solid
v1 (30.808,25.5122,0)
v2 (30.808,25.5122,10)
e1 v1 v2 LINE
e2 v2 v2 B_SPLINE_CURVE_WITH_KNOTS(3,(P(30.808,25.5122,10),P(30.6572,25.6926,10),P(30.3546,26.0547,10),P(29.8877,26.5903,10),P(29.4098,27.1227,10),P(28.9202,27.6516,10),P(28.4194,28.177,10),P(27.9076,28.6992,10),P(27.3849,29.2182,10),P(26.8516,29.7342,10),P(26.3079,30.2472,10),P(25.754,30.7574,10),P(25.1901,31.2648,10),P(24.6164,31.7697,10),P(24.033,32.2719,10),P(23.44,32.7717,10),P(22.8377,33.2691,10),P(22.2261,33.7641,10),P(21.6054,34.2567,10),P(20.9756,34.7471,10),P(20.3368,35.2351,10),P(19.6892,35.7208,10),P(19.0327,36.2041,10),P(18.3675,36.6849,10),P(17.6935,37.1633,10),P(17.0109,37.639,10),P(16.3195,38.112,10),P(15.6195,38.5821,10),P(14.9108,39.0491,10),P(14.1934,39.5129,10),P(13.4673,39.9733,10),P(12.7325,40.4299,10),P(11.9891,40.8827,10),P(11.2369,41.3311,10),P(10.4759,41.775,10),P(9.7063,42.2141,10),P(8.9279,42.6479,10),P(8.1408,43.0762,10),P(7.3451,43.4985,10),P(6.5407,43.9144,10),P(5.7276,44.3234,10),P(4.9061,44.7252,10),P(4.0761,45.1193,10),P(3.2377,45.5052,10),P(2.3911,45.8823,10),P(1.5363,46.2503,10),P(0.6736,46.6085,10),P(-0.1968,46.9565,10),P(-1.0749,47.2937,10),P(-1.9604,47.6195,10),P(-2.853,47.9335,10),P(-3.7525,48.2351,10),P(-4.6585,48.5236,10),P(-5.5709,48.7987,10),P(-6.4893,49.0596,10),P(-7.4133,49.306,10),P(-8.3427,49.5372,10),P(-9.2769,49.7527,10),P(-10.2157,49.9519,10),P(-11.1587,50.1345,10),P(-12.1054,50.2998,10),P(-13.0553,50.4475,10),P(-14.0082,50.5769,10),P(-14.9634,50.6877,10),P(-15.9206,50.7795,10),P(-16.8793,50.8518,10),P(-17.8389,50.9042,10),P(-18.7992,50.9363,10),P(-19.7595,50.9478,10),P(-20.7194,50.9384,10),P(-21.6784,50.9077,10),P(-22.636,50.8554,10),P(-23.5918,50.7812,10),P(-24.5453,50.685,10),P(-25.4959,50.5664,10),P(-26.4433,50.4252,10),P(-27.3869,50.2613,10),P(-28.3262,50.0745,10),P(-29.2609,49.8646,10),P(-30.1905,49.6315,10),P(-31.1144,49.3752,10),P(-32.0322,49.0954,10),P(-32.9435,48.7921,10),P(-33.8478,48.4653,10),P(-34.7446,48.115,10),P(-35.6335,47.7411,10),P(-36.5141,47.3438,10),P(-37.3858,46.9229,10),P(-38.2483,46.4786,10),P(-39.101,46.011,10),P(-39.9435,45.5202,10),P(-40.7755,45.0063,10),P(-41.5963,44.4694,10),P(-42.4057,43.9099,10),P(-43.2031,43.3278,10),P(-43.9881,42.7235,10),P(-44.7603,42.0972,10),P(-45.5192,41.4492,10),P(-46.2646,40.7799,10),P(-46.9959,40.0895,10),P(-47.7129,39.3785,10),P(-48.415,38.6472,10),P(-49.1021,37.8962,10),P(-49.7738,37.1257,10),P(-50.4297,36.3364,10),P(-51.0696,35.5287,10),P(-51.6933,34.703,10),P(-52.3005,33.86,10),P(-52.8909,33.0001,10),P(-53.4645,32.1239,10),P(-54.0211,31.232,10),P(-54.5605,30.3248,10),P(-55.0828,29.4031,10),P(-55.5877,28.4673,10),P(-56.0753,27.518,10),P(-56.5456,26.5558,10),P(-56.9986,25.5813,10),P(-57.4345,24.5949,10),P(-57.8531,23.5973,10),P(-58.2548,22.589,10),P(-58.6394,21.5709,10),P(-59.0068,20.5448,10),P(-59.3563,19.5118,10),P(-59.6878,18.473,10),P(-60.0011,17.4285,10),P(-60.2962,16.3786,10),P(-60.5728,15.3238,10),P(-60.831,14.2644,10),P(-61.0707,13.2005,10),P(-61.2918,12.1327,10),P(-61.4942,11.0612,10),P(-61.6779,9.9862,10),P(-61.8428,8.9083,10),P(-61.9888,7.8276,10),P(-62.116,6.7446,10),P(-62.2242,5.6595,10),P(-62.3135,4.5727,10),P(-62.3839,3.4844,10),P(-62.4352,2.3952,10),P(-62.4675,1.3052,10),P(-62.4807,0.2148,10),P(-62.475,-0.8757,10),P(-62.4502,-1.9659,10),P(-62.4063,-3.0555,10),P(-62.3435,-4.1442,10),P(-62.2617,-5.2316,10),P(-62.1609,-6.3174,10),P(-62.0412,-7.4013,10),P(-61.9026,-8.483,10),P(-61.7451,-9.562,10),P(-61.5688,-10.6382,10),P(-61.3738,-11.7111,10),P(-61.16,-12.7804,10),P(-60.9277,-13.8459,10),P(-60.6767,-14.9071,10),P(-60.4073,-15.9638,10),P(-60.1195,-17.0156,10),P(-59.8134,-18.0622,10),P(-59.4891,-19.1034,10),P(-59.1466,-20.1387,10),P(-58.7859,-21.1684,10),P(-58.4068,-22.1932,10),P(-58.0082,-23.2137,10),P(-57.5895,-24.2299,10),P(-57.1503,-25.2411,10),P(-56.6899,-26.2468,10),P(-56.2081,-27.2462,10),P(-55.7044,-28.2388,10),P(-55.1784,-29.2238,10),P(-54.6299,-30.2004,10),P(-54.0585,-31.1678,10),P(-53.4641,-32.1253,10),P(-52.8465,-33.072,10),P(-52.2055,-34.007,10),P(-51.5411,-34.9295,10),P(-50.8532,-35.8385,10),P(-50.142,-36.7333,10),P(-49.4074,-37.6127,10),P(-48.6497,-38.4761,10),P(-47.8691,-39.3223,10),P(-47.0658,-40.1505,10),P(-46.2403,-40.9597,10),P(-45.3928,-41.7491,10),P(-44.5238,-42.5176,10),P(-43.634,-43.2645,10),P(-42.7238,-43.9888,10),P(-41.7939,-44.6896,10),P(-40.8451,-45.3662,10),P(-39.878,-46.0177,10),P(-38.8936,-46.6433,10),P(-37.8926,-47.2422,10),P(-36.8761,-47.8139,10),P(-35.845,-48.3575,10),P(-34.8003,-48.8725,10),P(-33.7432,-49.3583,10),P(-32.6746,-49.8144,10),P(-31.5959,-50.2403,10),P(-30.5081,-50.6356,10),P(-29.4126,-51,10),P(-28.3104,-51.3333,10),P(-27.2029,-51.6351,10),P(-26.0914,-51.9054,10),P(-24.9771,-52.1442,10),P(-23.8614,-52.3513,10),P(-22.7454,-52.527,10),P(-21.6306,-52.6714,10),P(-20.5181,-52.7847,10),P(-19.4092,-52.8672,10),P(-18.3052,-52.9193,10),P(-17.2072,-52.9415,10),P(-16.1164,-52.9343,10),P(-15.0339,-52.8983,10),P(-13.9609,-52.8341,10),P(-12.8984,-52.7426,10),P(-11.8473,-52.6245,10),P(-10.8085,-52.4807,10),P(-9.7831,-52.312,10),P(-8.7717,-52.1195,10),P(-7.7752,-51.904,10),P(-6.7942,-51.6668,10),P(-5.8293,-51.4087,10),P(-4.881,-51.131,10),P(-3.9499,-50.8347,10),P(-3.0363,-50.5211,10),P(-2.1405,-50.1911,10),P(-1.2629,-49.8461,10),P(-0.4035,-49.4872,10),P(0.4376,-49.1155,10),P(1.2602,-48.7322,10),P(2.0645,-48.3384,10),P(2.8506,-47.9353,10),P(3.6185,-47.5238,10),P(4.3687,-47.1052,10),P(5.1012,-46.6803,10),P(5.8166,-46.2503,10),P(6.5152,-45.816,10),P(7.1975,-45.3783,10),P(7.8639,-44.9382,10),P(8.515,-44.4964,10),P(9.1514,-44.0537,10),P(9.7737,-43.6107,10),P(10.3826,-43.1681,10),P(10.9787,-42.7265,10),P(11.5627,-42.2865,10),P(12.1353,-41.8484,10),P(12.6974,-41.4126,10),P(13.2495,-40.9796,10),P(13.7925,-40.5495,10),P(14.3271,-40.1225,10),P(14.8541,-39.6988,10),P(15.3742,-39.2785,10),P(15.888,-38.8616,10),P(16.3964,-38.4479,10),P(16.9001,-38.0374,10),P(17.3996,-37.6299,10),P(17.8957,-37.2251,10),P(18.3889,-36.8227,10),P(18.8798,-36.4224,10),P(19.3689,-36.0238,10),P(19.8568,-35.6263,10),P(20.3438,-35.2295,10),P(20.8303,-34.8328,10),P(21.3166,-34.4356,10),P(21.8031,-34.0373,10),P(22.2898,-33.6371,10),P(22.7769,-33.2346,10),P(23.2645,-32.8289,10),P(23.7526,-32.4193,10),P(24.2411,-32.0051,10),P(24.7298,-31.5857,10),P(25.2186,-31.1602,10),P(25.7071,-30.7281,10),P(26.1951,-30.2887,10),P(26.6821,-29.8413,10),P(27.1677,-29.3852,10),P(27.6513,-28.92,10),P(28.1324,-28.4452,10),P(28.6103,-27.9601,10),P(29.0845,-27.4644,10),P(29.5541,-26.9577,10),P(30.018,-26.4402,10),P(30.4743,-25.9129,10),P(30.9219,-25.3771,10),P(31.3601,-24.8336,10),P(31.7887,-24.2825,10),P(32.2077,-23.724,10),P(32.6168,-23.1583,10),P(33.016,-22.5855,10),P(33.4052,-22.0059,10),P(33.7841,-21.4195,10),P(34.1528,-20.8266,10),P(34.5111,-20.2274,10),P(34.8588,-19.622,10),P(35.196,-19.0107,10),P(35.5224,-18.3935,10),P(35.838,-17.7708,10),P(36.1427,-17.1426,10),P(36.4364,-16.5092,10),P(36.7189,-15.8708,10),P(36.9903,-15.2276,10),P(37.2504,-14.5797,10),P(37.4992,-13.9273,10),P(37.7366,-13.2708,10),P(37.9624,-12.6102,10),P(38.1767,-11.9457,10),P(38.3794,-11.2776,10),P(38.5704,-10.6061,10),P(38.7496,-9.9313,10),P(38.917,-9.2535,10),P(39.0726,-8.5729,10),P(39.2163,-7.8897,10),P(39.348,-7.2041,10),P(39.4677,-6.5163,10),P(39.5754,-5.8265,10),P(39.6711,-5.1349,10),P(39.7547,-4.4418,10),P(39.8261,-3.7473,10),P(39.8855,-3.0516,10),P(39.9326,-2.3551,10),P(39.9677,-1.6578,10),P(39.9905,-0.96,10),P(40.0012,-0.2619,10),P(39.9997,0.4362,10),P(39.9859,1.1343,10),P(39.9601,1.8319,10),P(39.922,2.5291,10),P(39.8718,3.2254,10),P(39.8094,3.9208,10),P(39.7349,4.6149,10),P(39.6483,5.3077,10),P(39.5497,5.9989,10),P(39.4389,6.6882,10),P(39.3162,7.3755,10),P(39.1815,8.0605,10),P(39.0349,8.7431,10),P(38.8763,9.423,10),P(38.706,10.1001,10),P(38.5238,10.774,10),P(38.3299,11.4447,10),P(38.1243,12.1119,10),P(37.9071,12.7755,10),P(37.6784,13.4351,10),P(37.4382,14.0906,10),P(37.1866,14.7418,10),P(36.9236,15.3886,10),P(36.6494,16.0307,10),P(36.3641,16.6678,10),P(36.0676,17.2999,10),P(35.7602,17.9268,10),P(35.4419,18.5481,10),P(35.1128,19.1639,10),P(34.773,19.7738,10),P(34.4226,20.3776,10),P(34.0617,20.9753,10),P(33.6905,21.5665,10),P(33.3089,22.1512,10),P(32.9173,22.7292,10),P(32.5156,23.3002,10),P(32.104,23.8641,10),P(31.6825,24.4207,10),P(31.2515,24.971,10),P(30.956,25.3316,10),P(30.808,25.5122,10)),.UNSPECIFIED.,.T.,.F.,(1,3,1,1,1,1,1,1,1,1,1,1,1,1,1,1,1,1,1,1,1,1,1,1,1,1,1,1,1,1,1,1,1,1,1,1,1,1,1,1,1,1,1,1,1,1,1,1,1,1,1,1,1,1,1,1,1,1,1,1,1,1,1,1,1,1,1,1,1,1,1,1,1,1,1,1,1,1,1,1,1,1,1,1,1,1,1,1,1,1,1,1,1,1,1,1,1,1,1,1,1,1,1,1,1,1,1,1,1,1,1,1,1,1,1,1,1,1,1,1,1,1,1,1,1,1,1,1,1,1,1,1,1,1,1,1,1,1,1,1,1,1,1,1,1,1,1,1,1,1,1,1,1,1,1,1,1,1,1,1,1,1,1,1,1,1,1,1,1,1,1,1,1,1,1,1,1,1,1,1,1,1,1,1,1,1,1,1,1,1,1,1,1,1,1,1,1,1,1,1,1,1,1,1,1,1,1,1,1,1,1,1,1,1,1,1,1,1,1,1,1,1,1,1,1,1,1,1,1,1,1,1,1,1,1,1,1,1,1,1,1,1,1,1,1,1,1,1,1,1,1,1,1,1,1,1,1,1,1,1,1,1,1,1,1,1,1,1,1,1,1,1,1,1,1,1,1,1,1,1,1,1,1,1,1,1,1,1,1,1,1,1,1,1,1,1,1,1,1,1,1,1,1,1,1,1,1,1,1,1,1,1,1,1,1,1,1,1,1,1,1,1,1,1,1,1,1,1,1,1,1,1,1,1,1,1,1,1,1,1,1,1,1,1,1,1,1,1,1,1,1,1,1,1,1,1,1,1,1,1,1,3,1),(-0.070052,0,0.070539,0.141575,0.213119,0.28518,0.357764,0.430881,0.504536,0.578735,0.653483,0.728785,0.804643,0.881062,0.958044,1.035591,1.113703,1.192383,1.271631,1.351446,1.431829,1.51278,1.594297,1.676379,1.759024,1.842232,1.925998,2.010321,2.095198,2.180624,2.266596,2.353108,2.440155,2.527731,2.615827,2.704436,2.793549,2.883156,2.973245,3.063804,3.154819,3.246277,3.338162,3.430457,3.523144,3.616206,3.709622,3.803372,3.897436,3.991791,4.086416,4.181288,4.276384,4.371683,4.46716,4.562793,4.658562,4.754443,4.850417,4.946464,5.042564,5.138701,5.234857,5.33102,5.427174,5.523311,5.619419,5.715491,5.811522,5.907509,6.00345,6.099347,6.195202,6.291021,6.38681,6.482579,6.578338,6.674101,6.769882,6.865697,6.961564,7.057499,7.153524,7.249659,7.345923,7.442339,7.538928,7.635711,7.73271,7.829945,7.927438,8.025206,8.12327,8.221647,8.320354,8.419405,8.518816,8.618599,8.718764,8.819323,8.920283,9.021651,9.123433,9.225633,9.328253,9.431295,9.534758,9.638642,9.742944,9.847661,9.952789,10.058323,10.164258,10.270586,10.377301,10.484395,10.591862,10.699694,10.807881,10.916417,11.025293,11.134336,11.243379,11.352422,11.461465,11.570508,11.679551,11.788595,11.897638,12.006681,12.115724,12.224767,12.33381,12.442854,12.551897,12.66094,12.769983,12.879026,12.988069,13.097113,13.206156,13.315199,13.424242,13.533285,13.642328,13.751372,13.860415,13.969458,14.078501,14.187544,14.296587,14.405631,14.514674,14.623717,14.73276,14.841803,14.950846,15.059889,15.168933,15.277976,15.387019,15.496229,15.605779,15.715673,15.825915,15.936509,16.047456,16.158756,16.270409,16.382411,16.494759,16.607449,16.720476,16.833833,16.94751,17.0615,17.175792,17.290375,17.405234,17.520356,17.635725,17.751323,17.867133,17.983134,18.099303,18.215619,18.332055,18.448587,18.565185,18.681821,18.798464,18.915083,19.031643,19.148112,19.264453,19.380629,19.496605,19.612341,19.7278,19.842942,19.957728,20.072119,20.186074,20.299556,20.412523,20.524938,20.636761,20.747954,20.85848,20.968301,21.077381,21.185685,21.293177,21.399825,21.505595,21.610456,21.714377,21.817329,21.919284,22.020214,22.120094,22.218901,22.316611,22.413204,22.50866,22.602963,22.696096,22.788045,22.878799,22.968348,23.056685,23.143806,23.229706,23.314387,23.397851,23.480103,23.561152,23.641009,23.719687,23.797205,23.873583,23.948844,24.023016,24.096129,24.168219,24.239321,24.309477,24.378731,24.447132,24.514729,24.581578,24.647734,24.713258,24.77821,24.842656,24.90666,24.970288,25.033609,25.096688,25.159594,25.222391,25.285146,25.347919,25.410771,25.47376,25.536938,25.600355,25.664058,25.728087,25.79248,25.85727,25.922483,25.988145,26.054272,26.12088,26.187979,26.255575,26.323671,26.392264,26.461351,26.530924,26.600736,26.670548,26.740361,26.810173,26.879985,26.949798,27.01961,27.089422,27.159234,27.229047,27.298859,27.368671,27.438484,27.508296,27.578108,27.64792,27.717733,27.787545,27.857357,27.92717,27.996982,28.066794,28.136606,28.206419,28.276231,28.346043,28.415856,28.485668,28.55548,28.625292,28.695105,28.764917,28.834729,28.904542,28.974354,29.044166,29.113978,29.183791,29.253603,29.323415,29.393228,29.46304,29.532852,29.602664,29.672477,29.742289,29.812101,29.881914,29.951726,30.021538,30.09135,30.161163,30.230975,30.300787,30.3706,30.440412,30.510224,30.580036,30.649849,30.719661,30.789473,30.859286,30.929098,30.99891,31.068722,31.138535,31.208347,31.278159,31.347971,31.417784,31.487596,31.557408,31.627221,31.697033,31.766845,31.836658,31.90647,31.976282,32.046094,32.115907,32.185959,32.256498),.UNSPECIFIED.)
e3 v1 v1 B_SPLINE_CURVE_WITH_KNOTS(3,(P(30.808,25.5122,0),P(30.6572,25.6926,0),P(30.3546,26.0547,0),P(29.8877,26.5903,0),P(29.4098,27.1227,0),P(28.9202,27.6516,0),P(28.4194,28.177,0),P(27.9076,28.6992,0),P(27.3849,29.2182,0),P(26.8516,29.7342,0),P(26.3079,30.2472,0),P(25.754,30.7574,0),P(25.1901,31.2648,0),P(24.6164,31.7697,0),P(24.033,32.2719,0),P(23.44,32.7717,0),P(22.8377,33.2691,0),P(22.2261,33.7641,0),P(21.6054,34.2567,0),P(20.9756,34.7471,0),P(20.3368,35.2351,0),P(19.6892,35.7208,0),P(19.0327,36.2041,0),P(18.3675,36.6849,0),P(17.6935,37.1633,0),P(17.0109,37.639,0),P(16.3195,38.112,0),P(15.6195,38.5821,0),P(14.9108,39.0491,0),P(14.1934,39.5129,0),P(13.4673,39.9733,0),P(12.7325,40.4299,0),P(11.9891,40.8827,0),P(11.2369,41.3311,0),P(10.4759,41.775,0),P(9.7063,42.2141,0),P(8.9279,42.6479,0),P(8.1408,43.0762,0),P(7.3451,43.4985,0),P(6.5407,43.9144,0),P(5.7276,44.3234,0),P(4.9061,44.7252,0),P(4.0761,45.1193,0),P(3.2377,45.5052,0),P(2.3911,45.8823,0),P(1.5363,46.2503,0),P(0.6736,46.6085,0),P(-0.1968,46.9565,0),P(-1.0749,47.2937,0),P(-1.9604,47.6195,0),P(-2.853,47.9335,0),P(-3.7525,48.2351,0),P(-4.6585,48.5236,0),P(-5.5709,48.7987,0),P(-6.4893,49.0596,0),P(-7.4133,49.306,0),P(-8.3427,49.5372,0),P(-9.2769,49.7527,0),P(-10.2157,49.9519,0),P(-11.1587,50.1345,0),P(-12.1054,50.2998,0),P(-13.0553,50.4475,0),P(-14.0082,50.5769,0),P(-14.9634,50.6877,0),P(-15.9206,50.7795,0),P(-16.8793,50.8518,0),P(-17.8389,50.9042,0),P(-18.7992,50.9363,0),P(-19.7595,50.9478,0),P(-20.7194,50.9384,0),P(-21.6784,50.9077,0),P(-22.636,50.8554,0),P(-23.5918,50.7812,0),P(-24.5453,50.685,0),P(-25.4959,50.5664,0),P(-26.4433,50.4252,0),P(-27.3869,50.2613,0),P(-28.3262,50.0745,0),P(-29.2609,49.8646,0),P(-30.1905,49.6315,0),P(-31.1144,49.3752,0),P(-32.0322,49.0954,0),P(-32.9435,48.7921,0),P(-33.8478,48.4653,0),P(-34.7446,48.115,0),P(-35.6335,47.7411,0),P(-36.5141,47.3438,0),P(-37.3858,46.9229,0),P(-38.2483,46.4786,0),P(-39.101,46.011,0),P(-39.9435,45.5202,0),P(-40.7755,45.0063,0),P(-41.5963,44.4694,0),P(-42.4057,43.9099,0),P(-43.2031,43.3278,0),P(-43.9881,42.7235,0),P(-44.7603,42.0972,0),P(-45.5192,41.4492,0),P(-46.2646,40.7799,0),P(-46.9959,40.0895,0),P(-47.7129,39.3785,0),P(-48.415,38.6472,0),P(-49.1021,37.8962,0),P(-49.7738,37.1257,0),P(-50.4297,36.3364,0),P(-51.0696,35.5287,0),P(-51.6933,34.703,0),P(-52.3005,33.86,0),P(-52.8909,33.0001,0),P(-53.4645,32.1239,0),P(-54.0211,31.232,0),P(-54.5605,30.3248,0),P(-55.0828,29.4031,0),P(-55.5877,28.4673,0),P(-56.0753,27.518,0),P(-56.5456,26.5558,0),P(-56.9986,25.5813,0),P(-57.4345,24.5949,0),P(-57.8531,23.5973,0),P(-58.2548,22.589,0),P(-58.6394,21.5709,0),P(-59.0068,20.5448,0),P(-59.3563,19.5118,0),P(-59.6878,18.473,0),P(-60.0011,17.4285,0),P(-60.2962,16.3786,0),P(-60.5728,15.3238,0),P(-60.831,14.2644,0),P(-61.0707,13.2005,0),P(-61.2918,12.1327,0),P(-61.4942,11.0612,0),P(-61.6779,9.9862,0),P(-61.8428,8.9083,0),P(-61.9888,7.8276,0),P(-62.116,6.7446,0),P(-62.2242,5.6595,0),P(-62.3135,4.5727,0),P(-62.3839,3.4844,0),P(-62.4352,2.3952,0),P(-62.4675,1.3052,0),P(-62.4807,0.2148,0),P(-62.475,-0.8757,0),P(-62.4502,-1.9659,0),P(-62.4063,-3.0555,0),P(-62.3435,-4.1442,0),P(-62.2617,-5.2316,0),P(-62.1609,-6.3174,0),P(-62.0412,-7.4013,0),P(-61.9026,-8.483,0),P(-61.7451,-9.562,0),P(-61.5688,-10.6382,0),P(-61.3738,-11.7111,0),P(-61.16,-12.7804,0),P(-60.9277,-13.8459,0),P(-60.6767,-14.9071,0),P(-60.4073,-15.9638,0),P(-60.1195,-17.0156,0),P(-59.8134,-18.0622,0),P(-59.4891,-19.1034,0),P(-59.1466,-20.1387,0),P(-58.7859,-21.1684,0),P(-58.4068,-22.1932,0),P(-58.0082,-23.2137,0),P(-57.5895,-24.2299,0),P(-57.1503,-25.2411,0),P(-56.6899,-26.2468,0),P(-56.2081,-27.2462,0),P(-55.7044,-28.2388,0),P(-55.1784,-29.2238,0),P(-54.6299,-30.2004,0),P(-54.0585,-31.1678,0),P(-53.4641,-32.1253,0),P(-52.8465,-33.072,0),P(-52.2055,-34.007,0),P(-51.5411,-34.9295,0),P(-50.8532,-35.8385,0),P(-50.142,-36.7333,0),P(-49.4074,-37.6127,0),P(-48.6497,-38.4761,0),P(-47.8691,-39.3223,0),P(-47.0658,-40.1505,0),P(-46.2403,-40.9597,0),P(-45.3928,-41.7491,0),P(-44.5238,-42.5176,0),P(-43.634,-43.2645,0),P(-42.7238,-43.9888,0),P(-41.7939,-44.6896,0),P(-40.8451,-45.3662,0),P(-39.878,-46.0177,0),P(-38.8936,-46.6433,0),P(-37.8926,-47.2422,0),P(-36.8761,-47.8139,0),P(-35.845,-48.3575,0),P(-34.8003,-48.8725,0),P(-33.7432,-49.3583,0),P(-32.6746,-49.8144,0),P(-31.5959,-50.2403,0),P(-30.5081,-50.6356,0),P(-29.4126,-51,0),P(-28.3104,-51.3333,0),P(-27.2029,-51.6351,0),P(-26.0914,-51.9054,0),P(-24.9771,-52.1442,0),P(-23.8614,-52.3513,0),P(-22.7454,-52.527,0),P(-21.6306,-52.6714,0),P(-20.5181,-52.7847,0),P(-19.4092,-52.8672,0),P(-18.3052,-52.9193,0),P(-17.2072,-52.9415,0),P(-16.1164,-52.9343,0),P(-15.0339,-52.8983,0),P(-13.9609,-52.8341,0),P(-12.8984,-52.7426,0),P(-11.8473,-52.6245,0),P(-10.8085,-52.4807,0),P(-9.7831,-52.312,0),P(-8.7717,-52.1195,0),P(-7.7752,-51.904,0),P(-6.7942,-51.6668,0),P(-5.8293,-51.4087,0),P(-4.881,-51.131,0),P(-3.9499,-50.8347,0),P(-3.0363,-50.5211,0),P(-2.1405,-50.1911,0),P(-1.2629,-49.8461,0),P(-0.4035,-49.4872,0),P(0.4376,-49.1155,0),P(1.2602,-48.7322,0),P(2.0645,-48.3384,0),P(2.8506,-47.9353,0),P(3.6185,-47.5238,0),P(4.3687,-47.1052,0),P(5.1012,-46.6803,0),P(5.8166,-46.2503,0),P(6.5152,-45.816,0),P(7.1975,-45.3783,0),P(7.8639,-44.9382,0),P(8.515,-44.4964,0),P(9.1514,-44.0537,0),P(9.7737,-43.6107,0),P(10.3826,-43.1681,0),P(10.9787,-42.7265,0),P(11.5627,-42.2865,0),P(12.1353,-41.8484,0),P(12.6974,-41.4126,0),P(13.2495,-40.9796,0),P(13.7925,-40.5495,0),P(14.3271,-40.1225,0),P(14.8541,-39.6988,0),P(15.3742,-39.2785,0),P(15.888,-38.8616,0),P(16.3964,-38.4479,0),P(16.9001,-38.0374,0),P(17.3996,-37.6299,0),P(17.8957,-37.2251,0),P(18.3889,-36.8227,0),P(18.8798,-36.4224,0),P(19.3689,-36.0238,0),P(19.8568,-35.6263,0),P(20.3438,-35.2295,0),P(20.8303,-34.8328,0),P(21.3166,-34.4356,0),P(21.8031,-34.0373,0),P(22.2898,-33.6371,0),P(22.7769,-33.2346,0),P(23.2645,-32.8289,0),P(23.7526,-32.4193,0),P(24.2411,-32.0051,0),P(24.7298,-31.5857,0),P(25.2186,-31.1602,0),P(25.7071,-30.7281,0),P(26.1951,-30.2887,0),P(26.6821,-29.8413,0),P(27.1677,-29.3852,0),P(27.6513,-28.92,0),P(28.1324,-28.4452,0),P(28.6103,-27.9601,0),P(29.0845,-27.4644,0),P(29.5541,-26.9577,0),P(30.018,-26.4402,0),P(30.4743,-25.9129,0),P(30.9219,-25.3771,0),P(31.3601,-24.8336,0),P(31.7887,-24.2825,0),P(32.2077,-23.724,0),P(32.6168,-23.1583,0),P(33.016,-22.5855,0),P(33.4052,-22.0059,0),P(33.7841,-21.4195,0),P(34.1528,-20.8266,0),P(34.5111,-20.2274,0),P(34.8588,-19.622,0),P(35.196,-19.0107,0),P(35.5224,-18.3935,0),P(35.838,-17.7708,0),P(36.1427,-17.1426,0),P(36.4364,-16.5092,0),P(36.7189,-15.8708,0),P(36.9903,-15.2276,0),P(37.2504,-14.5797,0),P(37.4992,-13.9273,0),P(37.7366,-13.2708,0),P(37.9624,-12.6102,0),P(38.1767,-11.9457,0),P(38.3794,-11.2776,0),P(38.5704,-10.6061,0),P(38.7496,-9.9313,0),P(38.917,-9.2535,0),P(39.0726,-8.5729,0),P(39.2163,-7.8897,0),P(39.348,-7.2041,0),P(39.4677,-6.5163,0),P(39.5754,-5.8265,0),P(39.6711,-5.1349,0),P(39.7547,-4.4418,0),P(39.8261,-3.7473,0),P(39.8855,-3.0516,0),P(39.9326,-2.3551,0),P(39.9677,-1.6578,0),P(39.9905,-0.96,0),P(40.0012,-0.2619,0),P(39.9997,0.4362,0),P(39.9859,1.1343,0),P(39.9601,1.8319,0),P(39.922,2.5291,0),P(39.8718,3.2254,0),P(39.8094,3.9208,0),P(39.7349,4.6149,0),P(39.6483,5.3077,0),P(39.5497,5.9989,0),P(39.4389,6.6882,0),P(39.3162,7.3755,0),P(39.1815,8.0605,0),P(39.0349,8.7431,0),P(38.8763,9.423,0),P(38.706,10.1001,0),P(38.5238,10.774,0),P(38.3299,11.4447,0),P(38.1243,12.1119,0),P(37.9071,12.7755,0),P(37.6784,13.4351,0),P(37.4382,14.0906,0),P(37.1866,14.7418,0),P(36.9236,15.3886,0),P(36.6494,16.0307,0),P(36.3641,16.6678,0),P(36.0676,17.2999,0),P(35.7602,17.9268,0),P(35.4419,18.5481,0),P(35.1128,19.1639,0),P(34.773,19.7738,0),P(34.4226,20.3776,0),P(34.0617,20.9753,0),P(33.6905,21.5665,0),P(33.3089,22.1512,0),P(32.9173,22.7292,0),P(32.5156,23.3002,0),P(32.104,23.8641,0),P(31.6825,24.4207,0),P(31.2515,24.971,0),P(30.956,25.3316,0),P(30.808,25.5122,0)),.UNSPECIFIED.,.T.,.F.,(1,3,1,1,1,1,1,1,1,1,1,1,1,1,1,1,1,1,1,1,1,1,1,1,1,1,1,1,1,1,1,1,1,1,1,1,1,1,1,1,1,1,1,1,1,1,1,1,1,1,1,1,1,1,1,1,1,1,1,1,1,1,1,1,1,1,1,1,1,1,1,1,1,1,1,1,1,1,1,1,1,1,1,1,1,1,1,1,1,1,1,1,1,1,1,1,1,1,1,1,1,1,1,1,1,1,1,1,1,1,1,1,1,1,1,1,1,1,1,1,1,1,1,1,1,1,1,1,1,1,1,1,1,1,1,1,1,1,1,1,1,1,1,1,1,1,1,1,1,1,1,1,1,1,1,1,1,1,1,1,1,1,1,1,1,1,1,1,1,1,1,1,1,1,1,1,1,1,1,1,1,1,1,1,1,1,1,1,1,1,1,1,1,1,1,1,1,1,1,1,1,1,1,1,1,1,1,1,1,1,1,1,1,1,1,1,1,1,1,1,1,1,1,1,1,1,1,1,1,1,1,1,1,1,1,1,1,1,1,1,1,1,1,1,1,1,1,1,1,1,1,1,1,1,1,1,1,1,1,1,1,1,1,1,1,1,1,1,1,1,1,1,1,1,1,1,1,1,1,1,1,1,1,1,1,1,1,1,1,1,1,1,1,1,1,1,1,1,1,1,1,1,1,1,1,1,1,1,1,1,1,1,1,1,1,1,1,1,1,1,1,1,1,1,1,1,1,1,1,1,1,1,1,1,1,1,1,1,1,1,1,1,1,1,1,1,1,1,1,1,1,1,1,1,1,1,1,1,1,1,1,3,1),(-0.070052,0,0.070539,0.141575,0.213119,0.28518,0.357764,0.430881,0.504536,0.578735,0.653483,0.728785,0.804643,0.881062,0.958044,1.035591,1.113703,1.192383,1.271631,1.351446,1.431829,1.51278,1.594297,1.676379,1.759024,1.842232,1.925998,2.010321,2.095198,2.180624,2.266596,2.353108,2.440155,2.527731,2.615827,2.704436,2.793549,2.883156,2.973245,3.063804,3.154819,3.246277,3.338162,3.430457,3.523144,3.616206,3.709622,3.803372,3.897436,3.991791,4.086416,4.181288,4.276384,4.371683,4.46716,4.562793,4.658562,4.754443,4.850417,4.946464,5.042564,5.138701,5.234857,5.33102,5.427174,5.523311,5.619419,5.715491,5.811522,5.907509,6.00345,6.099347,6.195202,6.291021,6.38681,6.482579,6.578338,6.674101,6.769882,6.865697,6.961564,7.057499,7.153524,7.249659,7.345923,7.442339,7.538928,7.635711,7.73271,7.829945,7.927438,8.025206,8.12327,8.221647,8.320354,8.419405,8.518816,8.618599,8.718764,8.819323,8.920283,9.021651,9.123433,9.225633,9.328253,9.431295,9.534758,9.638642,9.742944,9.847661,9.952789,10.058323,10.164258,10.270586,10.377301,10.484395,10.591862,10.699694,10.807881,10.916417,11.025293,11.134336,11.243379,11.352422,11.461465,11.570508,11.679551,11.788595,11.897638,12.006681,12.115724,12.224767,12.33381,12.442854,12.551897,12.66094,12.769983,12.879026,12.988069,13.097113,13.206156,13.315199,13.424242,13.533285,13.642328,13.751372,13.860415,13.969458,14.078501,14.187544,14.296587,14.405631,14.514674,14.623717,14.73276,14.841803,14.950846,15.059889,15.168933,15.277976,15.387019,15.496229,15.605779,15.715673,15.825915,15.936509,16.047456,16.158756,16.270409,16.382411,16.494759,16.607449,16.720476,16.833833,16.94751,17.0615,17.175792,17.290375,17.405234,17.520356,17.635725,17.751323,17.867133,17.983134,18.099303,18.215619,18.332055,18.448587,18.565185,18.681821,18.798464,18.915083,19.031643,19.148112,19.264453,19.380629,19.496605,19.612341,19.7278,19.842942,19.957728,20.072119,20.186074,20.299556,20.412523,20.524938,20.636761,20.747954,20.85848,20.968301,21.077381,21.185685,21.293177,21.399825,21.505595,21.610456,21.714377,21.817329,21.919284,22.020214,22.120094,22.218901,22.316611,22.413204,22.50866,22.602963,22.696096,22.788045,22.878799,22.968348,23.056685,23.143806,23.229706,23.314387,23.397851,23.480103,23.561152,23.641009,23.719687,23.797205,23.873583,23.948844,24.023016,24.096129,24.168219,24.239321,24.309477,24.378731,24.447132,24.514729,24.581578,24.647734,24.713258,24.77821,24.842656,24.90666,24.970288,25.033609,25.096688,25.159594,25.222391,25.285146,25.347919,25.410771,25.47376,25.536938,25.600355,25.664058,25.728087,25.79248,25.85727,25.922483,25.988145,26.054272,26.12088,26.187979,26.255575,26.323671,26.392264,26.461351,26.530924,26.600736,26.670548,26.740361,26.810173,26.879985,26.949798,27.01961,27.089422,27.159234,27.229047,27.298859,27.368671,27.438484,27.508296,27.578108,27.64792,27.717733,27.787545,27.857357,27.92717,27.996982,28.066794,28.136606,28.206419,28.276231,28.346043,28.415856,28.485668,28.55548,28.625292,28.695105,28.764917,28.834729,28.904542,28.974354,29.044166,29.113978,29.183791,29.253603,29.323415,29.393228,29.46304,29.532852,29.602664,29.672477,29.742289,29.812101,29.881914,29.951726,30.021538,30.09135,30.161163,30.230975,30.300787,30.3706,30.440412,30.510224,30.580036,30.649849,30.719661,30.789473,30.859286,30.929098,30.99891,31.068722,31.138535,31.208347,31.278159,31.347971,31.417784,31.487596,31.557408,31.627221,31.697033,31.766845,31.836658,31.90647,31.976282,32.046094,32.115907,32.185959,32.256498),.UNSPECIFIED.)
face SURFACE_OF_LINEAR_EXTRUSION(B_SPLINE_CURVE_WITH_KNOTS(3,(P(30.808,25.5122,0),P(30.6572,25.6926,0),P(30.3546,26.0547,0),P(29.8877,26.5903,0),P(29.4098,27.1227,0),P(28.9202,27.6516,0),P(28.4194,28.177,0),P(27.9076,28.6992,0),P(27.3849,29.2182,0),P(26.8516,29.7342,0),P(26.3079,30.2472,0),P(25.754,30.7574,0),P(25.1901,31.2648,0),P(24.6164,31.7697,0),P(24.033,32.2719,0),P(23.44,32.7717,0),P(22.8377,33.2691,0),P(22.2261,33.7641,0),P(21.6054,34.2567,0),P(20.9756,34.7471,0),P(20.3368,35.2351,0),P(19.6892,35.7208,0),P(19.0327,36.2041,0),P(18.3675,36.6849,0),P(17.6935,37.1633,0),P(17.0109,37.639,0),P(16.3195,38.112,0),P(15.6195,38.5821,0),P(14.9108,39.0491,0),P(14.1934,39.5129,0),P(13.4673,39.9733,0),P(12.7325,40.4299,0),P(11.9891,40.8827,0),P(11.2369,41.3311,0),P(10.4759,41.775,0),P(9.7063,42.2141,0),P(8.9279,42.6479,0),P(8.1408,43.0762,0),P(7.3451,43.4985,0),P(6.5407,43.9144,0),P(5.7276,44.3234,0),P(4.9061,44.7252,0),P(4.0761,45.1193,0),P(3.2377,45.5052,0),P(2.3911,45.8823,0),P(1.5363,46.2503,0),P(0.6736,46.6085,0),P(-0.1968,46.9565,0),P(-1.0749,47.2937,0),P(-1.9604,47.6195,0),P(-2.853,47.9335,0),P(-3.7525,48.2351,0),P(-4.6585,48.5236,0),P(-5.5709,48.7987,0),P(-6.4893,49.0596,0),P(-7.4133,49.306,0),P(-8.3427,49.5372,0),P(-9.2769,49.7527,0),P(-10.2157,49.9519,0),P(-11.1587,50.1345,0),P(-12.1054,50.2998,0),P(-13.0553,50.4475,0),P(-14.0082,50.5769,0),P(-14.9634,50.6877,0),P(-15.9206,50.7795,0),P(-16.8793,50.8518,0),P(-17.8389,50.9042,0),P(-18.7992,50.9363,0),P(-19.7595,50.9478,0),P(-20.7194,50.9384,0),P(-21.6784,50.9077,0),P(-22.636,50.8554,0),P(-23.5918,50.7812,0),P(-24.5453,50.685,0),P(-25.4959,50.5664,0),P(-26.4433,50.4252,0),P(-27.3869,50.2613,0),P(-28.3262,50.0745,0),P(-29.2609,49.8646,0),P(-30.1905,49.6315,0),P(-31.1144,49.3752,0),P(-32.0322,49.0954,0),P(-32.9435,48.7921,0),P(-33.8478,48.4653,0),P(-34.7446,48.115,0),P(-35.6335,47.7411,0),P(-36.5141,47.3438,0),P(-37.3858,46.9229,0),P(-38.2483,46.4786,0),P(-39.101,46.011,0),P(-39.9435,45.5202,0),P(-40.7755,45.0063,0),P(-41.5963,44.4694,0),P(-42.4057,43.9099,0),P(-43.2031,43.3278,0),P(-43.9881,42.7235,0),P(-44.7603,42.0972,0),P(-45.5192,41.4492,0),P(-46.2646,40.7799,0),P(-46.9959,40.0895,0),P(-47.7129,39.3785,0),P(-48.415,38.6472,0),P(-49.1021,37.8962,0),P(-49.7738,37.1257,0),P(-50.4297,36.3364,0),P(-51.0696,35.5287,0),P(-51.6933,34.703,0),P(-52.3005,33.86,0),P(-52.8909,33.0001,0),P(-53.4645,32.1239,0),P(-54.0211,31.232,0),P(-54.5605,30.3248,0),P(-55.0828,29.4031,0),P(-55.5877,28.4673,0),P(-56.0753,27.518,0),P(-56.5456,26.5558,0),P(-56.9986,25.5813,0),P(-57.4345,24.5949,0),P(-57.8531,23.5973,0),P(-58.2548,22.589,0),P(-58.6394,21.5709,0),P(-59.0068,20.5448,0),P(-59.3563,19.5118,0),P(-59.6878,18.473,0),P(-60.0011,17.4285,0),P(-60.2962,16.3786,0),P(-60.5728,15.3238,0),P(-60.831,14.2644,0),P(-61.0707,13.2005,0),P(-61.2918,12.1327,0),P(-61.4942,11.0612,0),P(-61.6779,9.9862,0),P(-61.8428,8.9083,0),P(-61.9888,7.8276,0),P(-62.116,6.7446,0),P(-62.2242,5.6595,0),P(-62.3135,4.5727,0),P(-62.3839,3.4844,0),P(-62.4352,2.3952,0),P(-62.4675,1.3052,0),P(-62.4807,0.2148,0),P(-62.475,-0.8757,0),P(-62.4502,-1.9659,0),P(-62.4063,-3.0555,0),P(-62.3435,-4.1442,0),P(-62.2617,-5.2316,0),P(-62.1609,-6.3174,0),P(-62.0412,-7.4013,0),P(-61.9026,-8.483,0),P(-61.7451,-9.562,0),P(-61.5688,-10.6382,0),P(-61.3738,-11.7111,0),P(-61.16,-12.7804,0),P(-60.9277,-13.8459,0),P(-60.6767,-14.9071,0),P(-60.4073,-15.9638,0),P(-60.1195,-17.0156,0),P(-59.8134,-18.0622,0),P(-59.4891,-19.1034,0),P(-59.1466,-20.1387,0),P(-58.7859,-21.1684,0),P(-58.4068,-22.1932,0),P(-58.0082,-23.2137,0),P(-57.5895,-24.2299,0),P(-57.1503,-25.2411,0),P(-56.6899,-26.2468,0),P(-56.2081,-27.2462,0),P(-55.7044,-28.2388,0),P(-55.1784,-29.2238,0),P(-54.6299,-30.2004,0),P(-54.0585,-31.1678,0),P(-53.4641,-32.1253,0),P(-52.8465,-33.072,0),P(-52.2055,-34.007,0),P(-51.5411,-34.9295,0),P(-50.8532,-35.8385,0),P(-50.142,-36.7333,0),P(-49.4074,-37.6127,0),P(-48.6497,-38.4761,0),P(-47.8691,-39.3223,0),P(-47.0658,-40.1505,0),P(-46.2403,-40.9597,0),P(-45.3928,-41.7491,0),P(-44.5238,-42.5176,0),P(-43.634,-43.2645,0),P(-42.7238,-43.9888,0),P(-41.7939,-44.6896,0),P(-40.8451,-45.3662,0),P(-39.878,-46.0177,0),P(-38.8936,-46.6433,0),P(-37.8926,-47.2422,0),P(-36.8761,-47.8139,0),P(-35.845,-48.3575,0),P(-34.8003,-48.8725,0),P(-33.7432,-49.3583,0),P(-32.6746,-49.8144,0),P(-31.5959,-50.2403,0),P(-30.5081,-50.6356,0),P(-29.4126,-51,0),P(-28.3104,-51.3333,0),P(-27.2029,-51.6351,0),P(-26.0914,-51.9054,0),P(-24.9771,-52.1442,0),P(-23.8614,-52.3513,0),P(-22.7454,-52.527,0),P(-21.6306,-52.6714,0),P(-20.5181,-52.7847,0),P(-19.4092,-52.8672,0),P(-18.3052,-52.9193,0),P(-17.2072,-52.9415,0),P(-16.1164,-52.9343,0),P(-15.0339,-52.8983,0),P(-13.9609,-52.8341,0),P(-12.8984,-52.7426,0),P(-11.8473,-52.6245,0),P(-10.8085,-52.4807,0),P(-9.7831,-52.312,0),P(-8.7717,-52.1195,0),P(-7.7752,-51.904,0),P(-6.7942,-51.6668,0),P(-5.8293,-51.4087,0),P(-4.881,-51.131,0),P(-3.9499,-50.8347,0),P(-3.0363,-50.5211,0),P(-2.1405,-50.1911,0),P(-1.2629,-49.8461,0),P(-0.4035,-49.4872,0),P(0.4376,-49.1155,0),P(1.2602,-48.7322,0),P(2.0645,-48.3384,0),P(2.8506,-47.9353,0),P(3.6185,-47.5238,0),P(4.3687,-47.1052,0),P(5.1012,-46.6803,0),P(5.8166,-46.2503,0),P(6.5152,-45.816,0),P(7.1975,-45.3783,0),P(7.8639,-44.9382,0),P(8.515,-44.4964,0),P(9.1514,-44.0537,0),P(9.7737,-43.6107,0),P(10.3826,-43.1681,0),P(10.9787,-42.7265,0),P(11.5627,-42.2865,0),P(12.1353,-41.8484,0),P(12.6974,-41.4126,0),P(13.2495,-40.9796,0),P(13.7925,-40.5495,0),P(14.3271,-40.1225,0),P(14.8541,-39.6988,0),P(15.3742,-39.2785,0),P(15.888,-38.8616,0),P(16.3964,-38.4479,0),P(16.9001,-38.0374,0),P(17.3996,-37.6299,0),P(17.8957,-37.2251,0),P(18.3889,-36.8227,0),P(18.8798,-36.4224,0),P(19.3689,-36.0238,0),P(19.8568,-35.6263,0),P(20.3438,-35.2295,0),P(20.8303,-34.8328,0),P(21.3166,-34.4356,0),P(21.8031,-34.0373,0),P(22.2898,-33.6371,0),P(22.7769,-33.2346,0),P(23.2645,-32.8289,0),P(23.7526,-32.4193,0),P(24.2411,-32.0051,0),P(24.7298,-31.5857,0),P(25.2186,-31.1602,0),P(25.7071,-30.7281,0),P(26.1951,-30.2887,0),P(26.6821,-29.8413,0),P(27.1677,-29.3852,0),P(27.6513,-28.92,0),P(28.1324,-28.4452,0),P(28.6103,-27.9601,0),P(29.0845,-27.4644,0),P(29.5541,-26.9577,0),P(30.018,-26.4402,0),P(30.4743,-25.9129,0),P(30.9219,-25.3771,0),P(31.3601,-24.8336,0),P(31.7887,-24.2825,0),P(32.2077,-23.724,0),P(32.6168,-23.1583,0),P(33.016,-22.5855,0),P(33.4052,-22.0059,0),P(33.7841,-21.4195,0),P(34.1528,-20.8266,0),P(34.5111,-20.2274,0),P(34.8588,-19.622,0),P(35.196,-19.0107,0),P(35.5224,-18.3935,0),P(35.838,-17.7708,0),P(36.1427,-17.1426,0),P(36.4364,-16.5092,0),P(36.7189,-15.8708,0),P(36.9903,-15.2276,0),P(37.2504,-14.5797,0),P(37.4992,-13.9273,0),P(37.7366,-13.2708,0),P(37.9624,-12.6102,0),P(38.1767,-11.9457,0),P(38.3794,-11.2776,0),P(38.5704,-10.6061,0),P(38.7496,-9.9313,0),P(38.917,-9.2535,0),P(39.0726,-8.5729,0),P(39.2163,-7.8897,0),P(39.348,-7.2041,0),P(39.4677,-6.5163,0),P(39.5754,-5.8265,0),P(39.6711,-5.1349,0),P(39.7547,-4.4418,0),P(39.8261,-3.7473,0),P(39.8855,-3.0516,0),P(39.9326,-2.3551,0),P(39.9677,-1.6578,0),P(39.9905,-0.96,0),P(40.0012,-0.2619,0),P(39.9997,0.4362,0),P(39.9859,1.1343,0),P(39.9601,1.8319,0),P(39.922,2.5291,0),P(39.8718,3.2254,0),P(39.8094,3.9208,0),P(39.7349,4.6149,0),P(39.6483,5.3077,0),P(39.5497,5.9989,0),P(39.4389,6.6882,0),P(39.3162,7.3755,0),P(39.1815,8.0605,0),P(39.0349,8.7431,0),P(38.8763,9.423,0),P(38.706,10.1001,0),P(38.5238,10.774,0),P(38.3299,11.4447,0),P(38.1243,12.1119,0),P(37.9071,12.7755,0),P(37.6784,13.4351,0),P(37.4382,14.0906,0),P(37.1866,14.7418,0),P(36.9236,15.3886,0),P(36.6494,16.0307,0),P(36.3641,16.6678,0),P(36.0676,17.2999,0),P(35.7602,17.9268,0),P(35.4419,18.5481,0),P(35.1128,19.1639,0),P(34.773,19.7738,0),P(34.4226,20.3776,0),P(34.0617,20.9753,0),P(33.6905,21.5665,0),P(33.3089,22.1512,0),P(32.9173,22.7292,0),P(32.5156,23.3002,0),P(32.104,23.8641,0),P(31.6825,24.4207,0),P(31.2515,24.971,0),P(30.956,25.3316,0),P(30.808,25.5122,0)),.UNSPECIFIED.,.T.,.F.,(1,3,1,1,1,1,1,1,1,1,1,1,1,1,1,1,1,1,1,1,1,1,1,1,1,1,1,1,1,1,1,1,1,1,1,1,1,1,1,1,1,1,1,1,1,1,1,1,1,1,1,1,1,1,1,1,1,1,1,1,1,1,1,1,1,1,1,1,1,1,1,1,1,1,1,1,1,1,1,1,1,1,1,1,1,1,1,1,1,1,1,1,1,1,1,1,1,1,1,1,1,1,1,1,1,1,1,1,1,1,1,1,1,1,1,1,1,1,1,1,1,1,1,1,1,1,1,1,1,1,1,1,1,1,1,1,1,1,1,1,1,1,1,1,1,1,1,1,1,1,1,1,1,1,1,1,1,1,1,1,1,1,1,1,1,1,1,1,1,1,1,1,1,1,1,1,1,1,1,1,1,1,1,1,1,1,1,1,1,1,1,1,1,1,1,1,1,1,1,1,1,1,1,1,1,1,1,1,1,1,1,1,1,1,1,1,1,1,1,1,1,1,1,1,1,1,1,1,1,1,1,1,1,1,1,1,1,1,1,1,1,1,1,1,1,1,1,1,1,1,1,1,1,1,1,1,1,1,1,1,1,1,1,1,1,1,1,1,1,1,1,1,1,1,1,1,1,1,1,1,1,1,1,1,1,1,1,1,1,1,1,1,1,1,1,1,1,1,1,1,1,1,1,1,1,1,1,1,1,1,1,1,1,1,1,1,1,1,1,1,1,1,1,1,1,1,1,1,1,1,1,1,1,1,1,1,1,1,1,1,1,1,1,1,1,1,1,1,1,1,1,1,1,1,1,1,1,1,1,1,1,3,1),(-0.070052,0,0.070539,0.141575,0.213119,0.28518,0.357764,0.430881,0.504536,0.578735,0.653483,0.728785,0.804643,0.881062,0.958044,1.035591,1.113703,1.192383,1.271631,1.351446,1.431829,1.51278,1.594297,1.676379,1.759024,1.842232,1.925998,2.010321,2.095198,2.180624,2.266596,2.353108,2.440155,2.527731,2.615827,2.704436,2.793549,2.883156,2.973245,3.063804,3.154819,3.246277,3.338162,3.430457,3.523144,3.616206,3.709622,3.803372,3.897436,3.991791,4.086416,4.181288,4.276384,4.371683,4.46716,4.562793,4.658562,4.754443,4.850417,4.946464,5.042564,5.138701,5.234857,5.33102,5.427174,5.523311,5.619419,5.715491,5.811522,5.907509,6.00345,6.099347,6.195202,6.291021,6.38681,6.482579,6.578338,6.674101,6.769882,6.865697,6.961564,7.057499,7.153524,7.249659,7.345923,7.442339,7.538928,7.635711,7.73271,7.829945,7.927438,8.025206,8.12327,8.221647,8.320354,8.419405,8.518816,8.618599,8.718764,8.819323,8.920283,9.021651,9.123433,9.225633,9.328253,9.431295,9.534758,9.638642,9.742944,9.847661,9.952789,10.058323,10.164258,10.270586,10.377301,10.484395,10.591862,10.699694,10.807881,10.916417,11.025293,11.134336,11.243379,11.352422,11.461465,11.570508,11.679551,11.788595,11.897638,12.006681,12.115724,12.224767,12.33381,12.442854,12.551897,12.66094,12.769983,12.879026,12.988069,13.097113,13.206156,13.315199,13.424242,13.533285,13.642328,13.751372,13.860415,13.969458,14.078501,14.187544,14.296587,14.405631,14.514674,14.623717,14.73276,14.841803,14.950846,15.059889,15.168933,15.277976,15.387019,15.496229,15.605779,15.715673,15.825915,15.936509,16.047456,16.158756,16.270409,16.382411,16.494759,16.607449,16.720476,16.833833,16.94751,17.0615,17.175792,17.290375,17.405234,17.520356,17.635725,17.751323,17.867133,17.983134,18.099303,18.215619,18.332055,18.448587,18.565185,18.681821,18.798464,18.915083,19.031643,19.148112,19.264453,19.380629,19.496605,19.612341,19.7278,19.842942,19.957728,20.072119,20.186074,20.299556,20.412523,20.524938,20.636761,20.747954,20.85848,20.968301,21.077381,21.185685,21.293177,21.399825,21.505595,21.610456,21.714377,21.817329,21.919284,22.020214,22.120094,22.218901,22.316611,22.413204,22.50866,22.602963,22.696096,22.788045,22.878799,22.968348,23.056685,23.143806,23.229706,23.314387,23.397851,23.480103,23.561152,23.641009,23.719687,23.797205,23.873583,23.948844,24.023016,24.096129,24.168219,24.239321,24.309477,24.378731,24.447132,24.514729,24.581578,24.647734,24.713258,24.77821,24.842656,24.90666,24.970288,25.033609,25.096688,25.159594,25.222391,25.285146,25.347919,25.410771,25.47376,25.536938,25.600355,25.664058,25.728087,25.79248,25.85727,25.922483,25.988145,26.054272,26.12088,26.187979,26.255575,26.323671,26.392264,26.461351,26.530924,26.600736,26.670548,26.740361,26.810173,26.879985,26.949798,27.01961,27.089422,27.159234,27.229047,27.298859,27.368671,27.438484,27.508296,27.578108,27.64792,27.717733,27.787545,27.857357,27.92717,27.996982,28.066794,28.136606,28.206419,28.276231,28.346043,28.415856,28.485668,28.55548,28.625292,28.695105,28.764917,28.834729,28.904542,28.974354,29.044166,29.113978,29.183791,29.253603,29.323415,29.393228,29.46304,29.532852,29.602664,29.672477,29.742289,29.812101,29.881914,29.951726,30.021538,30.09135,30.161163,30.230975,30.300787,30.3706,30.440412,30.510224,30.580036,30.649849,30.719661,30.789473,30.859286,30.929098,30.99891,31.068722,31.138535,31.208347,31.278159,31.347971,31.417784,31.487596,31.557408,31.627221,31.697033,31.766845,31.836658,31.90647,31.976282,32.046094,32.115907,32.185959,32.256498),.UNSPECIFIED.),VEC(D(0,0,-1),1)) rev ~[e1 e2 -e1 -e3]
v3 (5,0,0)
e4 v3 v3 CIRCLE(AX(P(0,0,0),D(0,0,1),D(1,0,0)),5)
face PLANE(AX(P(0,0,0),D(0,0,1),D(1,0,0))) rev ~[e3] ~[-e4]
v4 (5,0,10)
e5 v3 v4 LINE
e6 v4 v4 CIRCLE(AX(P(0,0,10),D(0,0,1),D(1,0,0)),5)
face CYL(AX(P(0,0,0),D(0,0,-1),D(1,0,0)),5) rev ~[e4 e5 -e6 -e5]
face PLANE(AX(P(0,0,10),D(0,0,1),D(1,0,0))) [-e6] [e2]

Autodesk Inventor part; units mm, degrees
ref_plane "YZ Plane" through (0, 0, 0) normal (1, 0, 0) x (0, 1, 0)
ref_plane "XZ Plane" through (0, 0, 0) normal (0, 1, 0) x (-1, 0, 0)
ref_plane "XY Plane" through (0, 0, 0) normal (0, 0, 1) x (1, 0, 0)
sketch "草圖1" plane through (0, 0, 0) normal (0, 0, 1) x (1, 0, 0)
  spline S0 degree 3 poles (30.808, 25.5122) (30.6572, 25.6926) (30.3546, 26.0547) (29.8877, 26.5903) (29.4098, 27.1227) (28.9202, 27.6516) (28.4194, 28.177) (27.9076, 28.6992) (27.3849, 29.2182) (26.8516, 29.7342) (26.3079, 30.2472) (25.754, 30.7574) (25.1901, 31.2648) (24.6164, 31.7697) (24.033, 32.2719) (23.44, 32.7717) (22.8377, 33.2691) (22.2261, 33.7641) (21.6054, 34.2567) (20.9756, 34.7471) (20.3368, 35.2351) (19.6892, 35.7208) (19.0327, 36.2041) (18.3675, 36.6849) (17.6935, 37.1633) (17.0109, 37.639) (16.3195, 38.112) (15.6195, 38.5821) (14.9108, 39.0491) (14.1934, 39.5129) (13.4673, 39.9733) (12.7325, 40.4299) (11.9891, 40.8827) (11.2369, 41.3311) (10.4759, 41.775) (9.7063, 42.2141) (8.9279, 42.6479) (8.1408, 43.0762) (7.3451, 43.4985) (6.5407, 43.9144) (5.7276, 44.3234) (4.9061, 44.7252) (4.0761, 45.1193) (3.2377, 45.5052) (2.3911, 45.8823) (1.5363, 46.2503) (0.6736, 46.6085) (-0.1968, 46.9565) (-1.0749, 47.2937) (-1.9604, 47.6195) (-2.853, 47.9335) (-3.7525, 48.2351) (-4.6585, 48.5236) (-5.5709, 48.7987) (-6.4893, 49.0596) (-7.4133, 49.306) (-8.3427, 49.5372) (-9.2769, 49.7527) (-10.2157, 49.9519) (-11.1587, 50.1345) (-12.1054, 50.2998) (-13.0553, 50.4475) (-14.0082, 50.5769) (-14.9634, 50.6877) (-15.9206, 50.7795) (-16.8793, 50.8518) (-17.8389, 50.9042) (-18.7992, 50.9363) (-19.7595, 50.9478) (-20.7194, 50.9384) (-21.6784, 50.9077) (-22.636, 50.8554) (-23.5918, 50.7812) (-24.5453, 50.685) (-25.4959, 50.5664) (-26.4433, 50.4252) (-27.3869, 50.2613) (-28.3262, 50.0745) (-29.2609, 49.8646) (-30.1905, 49.6315) (-31.1144, 49.3752) (-32.0322, 49.0954) (-32.9435, 48.7921) (-33.8478, 48.4653) (-34.7446, 48.115) (-35.6335, 47.7411) (-36.5141, 47.3438) (-37.3858, 46.9229) (-38.2483, 46.4786) (-39.101, 46.011) (-39.9435, 45.5202) (-40.7755, 45.0063) (-41.5963, 44.4694) (-42.4057, 43.9099) (-43.2031, 43.3278) (-43.9881, 42.7235) (-44.7603, 42.0972) (-45.5192, 41.4492) (-46.2646, 40.7799) (-46.9959, 40.0895) (-47.7129, 39.3785) (-48.415, 38.6472) (-49.1021, 37.8962) (-49.7738, 37.1257) (-50.4297, 36.3364) (-51.0696, 35.5287) (-51.6933, 34.703) (-52.3005, 33.86) (-52.8909, 33.0001) (-53.4645, 32.1239) (-54.0211, 31.232) (-54.5605, 30.3248) (-55.0828, 29.4031) (-55.5877, 28.4673) (-56.0753, 27.518) (-56.5456, 26.5558) (-56.9986, 25.5813) (-57.4345, 24.5949) (-57.8531, 23.5973) (-58.2548, 22.589) (-58.6394, 21.5709) (-59.0068, 20.5448) (-59.3563, 19.5118) (-59.6878, 18.473) (-60.0011, 17.4285) (-60.2962, 16.3786) (-60.5728, 15.3238) (-60.831, 14.2644) (-61.0707, 13.2005) (-61.2918, 12.1327) (-61.4942, 11.0612) (-61.6779, 9.9862) (-61.8428, 8.9083) (-61.9888, 7.8276) (-62.116, 6.7446) (-62.2242, 5.6595) (-62.3135, 4.5727) (-62.3839, 3.4844) (-62.4352, 2.3952) (-62.4675, 1.3052) (-62.4807, 0.2148) (-62.475, -0.8757) (-62.4502, -1.9659) (-62.4063, -3.0555) (-62.3435, -4.1442) (-62.2617, -5.2316) (-62.1609, -6.3174) (-62.0412, -7.4013) (-61.9026, -8.483) (-61.7451, -9.562) (-61.5688, -10.6382) (-61.3738, -11.7111) (-61.16, -12.7804) (-60.9277, -13.8459) (-60.6767, -14.9071) (-60.4073, -15.9638) (-60.1195, -17.0156) (-59.8134, -18.0622) (-59.4891, -19.1034) (-59.1466, -20.1387) (-58.7859, -21.1684) (-58.4068, -22.1932) (-58.0082, -23.2137) (-57.5895, -24.2299) (-57.1503, -25.2411) (-56.6899, -26.2468) (-56.2081, -27.2462) (-55.7044, -28.2388) (-55.1784, -29.2238) (-54.6299, -30.2004) (-54.0585, -31.1678) (-53.4641, -32.1253) (-52.8465, -33.072) (-52.2055, -34.007) (-51.5411, -34.9295) (-50.8532, -35.8385) (-50.142, -36.7333) (-49.4074, -37.6127) (-48.6497, -38.4761) (-47.8691, -39.3223) (-47.0658, -40.1505) (-46.2403, -40.9597) (-45.3928, -41.7491) (-44.5238, -42.5176) (-43.634, -43.2645) (-42.7238, -43.9888) (-41.7939, -44.6896) (-40.8451, -45.3662) (-39.878, -46.0177) (-38.8936, -46.6433) (-37.8926, -47.2422) (-36.8761, -47.8139) (-35.845, -48.3575) (-34.8003, -48.8725) (-33.7432, -49.3583) (-32.6746, -49.8144) (-31.5959, -50.2403) (-30.5081, -50.6356) (-29.4126, -51) (-28.3104, -51.3333) (-27.2029, -51.6351) (-26.0914, -51.9054) (-24.9771, -52.1442) (-23.8614, -52.3513) (-22.7454, -52.527) (-21.6306, -52.6714) (-20.5181, -52.7847) (-19.4092, -52.8672) (-18.3052, -52.9193) (-17.2072, -52.9415) (-16.1164, -52.9343) (-15.0339, -52.8983) (-13.9609, -52.8341) (-12.8984, -52.7426) (-11.8473, -52.6245) (-10.8085, -52.4807) (-9.7831, -52.312) (-8.7717, -52.1195) (-7.7752, -51.904) (-6.7942, -51.6668) (-5.8293, -51.4087) (-4.881, -51.131) (-3.9499, -50.8347) (-3.0363, -50.5211) (-2.1405, -50.1911) (-1.2629, -49.8461) (-0.4035, -49.4872) (0.4376, -49.1155) (1.2602, -48.7322) (2.0645, -48.3384) (2.8506, -47.9353) (3.6185, -47.5238) (4.3687, -47.1052) (5.1012, -46.6803) (5.8166, -46.2503) (6.5152, -45.816) (7.1975, -45.3783) (7.8639, -44.9382) (8.515, -44.4964) (9.1514, -44.0537) (9.7737, -43.6107) (10.3826, -43.1681) (10.9787, -42.7265) (11.5627, -42.2865) (12.1353, -41.8484) (12.6974, -41.4126) (13.2495, -40.9796) (13.7925, -40.5495) (14.3271, -40.1225) (14.8541, -39.6988) (15.3742, -39.2785) (15.888, -38.8616) (16.3964, -38.4479) (16.9001, -38.0374) (17.3996, -37.6299) (17.8957, -37.2251) (18.3889, -36.8227) (18.8798, -36.4224) (19.3689, -36.0238) (19.8568, -35.6263) (20.3438, -35.2295) (20.8303, -34.8328) (21.3166, -34.4356) (21.8031, -34.0373) (22.2898, -33.6371) (22.7769, -33.2346) (23.2645, -32.8289) (23.7526, -32.4193) (24.2411, -32.0051) (24.7298, -31.5857) (25.2186, -31.1602) (25.7071, -30.7281) (26.1951, -30.2887) (26.6821, -29.8413) (27.1677, -29.3852) (27.6513, -28.92) (28.1324, -28.4452) (28.6103, -27.9601) (29.0845, -27.4644) (29.5541, -26.9577) (30.018, -26.4402) (30.4743, -25.9129) (30.9219, -25.3771) (31.3601, -24.8336) (31.7887, -24.2825) (32.2077, -23.724) (32.6168, -23.1583) (33.016, -22.5855) (33.4052, -22.0059) (33.7841, -21.4195) (34.1528, -20.8266) (34.5111, -20.2274) (34.8588, -19.622) (35.196, -19.0107) (35.5224, -18.3935) (35.838, -17.7708) (36.1427, -17.1426) (36.4364, -16.5092) (36.7189, -15.8708) (36.9903, -15.2276) (37.2504, -14.5797) (37.4992, -13.9273) (37.7366, -13.2708) (37.9624, -12.6102) (38.1767, -11.9457) (38.3794, -11.2776) (38.5704, -10.6061) (38.7496, -9.9313) (38.917, -9.2535) (39.0726, -8.5729) (39.2163, -7.8897) (39.348, -7.2041) (39.4677, -6.5163) (39.5754, -5.8265) (39.6711, -5.1349) (39.7547, -4.4418) (39.8261, -3.7473) (39.8855, -3.0516) (39.9326, -2.3551) (39.9677, -1.6578) (39.9905, -0.96) (40.0012, -0.2619) (39.9997, 0.4362) (39.9859, 1.1343) (39.9601, 1.8319) (39.922, 2.5291) (39.8718, 3.2254) (39.8094, 3.9208) (39.7349, 4.6149) (39.6483, 5.3077) (39.5497, 5.9989) (39.4389, 6.6882) (39.3162, 7.3755) (39.1815, 8.0605) (39.0349, 8.7431) (38.8763, 9.423) (38.706, 10.1001) (38.5238, 10.774) (38.3299, 11.4447) (38.1243, 12.1119) (37.9071, 12.7755) (37.6784, 13.4351) (37.4382, 14.0906) (37.1866, 14.7418) (36.9236, 15.3886) (36.6494, 16.0307) (36.3641, 16.6678) (36.0676, 17.2999) (35.7602, 17.9268) (35.4419, 18.5481) (35.1128, 19.1639) (34.773, 19.7738) (34.4226, 20.3776) (34.0617, 20.9753) (33.6905, 21.5665) (33.3089, 22.1512) (32.9173, 22.7292) (32.5156, 23.3002) (32.104, 23.8641) (31.6825, 24.4207) (31.2515, 24.971) (30.956, 25.3316) (30.808, 25.5122) knots 0 0 0 0 0.070539 0.141575 0.213119 0.28518 0.357764 0.430881 0.504536 0.578735 0.653483 0.728785 0.804643 0.881062 0.958044 1.035591 1.113703 1.192383 1.271631 1.351446 1.431829 1.51278 1.594297 1.676379 1.759024 1.842232 1.925998 2.010321 2.095198 2.180624 2.266596 2.353108 2.440155 2.527731 2.615827 2.704436 2.793549 2.883156 2.973245 3.063804 3.154819 3.246277 3.338162 3.430457 3.523144 3.616206 3.709622 3.803372 3.897436 3.991791 4.086416 4.181288 4.276384 4.371683 4.46716 4.562793 4.658562 4.754443 4.850417 4.946464 5.042564 5.138701 5.234857 5.33102 5.427174 5.523311 5.619419 5.715491 5.811522 5.907509 6.00345 6.099347 6.195202 6.291021 6.38681 6.482579 6.578338 6.674101 6.769882 6.865697 6.961564 7.057499 7.153524 7.249659 7.345923 7.442339 7.538928 7.635711 7.73271 7.829945 7.927438 8.025206 8.12327 8.221647 8.320354 8.419405 8.518816 8.618599 8.718764 8.819323 8.920283 9.021651 9.123433 9.225633 9.328253 9.431295 9.534758 9.638642 9.742944 9.847661 9.952789 10.058323 10.164258 10.270586 10.377301 10.484395 10.591862 10.699694 10.807881 10.916417 11.025293 11.134336 11.243379 11.352422 11.461465 11.570508 11.679551 11.788595 11.897638 12.006681 12.115724 12.224767 12.33381 12.442854 12.551897 12.66094 12.769983 12.879026 12.988069 13.097113 13.206156 13.315199 13.424242 13.533285 13.642328 13.751372 13.860415 13.969458 14.078501 14.187544 14.296587 14.405631 14.514674 14.623717 14.73276 14.841803 14.950846 15.059889 15.168933 15.277976 15.387019 15.496229 15.605779 15.715673 15.825915 15.936509 16.047456 16.158756 16.270409 16.382411 16.494759 16.607449 16.720476 16.833833 16.94751 17.0615 17.175792 17.290375 17.405234 17.520356 17.635725 17.751323 17.867133 17.983134 18.099303 18.215619 18.332055 18.448587 18.565185 18.681821 18.798464 18.915083 19.031643 19.148112 19.264453 19.380629 19.496605 19.612341 19.7278 19.842942 19.957728 20.072119 20.186074 20.299556 20.412523 20.524938 20.636761 20.747954 20.85848 20.968301 21.077381 21.185685 21.293177 21.399825 21.505595 21.610456 21.714377 21.817329 21.919284 22.020214 22.120094 22.218901 22.316611 22.413204 22.50866 22.602963 22.696096 22.788045 22.878799 22.968348 23.056685 23.143806 23.229706 23.314387 23.397851 23.480103 23.561152 23.641009 23.719687 23.797205 23.873583 23.948844 24.023016 24.096129 24.168219 24.239321 24.309477 24.378731 24.447132 24.514729 24.581578 24.647734 24.713258 24.77821 24.842656 24.90666 24.970288 25.033609 25.096688 25.159594 25.222391 25.285146 25.347919 25.410771 25.47376 25.536938 25.600355 25.664058 25.728087 25.79248 25.85727 25.922483 25.988145 26.054272 26.12088 26.187979 26.255575 26.323671 26.392264 26.461351 26.530924 26.600736 26.670548 26.740361 26.810173 26.879985 26.949798 27.01961 27.089422 27.159234 27.229047 27.298859 27.368671 27.438484 27.508296 27.578108 27.64792 27.717733 27.787545 27.857357 27.92717 27.996982 28.066794 28.136606 28.206419 28.276231 28.346043 28.415856 28.485668 28.55548 28.625292 28.695105 28.764917 28.834729 28.904542 28.974354 29.044166 29.113978 29.183791 29.253603 29.323415 29.393228 29.46304 29.532852 29.602664 29.672477 29.742289 29.812101 29.881914 29.951726 30.021538 30.09135 30.161163 30.230975 30.300787 30.3706 30.440412 30.510224 30.580036 30.649849 30.719661 30.789473 30.859286 30.929098 30.99891 31.068722 31.138535 31.208347 31.278159 31.347971 31.417784 31.487596 31.557408 31.627221 31.697033 31.766845 31.836658 31.90647 31.976282 32.046094 32.115907 32.185959 32.185959 32.185959 32.185959
  circle A0 centre (0, 0) radius 5
extrude "擠出1" add sketch "草圖1" along normal blind 10
properties part number "凸輪_2"
